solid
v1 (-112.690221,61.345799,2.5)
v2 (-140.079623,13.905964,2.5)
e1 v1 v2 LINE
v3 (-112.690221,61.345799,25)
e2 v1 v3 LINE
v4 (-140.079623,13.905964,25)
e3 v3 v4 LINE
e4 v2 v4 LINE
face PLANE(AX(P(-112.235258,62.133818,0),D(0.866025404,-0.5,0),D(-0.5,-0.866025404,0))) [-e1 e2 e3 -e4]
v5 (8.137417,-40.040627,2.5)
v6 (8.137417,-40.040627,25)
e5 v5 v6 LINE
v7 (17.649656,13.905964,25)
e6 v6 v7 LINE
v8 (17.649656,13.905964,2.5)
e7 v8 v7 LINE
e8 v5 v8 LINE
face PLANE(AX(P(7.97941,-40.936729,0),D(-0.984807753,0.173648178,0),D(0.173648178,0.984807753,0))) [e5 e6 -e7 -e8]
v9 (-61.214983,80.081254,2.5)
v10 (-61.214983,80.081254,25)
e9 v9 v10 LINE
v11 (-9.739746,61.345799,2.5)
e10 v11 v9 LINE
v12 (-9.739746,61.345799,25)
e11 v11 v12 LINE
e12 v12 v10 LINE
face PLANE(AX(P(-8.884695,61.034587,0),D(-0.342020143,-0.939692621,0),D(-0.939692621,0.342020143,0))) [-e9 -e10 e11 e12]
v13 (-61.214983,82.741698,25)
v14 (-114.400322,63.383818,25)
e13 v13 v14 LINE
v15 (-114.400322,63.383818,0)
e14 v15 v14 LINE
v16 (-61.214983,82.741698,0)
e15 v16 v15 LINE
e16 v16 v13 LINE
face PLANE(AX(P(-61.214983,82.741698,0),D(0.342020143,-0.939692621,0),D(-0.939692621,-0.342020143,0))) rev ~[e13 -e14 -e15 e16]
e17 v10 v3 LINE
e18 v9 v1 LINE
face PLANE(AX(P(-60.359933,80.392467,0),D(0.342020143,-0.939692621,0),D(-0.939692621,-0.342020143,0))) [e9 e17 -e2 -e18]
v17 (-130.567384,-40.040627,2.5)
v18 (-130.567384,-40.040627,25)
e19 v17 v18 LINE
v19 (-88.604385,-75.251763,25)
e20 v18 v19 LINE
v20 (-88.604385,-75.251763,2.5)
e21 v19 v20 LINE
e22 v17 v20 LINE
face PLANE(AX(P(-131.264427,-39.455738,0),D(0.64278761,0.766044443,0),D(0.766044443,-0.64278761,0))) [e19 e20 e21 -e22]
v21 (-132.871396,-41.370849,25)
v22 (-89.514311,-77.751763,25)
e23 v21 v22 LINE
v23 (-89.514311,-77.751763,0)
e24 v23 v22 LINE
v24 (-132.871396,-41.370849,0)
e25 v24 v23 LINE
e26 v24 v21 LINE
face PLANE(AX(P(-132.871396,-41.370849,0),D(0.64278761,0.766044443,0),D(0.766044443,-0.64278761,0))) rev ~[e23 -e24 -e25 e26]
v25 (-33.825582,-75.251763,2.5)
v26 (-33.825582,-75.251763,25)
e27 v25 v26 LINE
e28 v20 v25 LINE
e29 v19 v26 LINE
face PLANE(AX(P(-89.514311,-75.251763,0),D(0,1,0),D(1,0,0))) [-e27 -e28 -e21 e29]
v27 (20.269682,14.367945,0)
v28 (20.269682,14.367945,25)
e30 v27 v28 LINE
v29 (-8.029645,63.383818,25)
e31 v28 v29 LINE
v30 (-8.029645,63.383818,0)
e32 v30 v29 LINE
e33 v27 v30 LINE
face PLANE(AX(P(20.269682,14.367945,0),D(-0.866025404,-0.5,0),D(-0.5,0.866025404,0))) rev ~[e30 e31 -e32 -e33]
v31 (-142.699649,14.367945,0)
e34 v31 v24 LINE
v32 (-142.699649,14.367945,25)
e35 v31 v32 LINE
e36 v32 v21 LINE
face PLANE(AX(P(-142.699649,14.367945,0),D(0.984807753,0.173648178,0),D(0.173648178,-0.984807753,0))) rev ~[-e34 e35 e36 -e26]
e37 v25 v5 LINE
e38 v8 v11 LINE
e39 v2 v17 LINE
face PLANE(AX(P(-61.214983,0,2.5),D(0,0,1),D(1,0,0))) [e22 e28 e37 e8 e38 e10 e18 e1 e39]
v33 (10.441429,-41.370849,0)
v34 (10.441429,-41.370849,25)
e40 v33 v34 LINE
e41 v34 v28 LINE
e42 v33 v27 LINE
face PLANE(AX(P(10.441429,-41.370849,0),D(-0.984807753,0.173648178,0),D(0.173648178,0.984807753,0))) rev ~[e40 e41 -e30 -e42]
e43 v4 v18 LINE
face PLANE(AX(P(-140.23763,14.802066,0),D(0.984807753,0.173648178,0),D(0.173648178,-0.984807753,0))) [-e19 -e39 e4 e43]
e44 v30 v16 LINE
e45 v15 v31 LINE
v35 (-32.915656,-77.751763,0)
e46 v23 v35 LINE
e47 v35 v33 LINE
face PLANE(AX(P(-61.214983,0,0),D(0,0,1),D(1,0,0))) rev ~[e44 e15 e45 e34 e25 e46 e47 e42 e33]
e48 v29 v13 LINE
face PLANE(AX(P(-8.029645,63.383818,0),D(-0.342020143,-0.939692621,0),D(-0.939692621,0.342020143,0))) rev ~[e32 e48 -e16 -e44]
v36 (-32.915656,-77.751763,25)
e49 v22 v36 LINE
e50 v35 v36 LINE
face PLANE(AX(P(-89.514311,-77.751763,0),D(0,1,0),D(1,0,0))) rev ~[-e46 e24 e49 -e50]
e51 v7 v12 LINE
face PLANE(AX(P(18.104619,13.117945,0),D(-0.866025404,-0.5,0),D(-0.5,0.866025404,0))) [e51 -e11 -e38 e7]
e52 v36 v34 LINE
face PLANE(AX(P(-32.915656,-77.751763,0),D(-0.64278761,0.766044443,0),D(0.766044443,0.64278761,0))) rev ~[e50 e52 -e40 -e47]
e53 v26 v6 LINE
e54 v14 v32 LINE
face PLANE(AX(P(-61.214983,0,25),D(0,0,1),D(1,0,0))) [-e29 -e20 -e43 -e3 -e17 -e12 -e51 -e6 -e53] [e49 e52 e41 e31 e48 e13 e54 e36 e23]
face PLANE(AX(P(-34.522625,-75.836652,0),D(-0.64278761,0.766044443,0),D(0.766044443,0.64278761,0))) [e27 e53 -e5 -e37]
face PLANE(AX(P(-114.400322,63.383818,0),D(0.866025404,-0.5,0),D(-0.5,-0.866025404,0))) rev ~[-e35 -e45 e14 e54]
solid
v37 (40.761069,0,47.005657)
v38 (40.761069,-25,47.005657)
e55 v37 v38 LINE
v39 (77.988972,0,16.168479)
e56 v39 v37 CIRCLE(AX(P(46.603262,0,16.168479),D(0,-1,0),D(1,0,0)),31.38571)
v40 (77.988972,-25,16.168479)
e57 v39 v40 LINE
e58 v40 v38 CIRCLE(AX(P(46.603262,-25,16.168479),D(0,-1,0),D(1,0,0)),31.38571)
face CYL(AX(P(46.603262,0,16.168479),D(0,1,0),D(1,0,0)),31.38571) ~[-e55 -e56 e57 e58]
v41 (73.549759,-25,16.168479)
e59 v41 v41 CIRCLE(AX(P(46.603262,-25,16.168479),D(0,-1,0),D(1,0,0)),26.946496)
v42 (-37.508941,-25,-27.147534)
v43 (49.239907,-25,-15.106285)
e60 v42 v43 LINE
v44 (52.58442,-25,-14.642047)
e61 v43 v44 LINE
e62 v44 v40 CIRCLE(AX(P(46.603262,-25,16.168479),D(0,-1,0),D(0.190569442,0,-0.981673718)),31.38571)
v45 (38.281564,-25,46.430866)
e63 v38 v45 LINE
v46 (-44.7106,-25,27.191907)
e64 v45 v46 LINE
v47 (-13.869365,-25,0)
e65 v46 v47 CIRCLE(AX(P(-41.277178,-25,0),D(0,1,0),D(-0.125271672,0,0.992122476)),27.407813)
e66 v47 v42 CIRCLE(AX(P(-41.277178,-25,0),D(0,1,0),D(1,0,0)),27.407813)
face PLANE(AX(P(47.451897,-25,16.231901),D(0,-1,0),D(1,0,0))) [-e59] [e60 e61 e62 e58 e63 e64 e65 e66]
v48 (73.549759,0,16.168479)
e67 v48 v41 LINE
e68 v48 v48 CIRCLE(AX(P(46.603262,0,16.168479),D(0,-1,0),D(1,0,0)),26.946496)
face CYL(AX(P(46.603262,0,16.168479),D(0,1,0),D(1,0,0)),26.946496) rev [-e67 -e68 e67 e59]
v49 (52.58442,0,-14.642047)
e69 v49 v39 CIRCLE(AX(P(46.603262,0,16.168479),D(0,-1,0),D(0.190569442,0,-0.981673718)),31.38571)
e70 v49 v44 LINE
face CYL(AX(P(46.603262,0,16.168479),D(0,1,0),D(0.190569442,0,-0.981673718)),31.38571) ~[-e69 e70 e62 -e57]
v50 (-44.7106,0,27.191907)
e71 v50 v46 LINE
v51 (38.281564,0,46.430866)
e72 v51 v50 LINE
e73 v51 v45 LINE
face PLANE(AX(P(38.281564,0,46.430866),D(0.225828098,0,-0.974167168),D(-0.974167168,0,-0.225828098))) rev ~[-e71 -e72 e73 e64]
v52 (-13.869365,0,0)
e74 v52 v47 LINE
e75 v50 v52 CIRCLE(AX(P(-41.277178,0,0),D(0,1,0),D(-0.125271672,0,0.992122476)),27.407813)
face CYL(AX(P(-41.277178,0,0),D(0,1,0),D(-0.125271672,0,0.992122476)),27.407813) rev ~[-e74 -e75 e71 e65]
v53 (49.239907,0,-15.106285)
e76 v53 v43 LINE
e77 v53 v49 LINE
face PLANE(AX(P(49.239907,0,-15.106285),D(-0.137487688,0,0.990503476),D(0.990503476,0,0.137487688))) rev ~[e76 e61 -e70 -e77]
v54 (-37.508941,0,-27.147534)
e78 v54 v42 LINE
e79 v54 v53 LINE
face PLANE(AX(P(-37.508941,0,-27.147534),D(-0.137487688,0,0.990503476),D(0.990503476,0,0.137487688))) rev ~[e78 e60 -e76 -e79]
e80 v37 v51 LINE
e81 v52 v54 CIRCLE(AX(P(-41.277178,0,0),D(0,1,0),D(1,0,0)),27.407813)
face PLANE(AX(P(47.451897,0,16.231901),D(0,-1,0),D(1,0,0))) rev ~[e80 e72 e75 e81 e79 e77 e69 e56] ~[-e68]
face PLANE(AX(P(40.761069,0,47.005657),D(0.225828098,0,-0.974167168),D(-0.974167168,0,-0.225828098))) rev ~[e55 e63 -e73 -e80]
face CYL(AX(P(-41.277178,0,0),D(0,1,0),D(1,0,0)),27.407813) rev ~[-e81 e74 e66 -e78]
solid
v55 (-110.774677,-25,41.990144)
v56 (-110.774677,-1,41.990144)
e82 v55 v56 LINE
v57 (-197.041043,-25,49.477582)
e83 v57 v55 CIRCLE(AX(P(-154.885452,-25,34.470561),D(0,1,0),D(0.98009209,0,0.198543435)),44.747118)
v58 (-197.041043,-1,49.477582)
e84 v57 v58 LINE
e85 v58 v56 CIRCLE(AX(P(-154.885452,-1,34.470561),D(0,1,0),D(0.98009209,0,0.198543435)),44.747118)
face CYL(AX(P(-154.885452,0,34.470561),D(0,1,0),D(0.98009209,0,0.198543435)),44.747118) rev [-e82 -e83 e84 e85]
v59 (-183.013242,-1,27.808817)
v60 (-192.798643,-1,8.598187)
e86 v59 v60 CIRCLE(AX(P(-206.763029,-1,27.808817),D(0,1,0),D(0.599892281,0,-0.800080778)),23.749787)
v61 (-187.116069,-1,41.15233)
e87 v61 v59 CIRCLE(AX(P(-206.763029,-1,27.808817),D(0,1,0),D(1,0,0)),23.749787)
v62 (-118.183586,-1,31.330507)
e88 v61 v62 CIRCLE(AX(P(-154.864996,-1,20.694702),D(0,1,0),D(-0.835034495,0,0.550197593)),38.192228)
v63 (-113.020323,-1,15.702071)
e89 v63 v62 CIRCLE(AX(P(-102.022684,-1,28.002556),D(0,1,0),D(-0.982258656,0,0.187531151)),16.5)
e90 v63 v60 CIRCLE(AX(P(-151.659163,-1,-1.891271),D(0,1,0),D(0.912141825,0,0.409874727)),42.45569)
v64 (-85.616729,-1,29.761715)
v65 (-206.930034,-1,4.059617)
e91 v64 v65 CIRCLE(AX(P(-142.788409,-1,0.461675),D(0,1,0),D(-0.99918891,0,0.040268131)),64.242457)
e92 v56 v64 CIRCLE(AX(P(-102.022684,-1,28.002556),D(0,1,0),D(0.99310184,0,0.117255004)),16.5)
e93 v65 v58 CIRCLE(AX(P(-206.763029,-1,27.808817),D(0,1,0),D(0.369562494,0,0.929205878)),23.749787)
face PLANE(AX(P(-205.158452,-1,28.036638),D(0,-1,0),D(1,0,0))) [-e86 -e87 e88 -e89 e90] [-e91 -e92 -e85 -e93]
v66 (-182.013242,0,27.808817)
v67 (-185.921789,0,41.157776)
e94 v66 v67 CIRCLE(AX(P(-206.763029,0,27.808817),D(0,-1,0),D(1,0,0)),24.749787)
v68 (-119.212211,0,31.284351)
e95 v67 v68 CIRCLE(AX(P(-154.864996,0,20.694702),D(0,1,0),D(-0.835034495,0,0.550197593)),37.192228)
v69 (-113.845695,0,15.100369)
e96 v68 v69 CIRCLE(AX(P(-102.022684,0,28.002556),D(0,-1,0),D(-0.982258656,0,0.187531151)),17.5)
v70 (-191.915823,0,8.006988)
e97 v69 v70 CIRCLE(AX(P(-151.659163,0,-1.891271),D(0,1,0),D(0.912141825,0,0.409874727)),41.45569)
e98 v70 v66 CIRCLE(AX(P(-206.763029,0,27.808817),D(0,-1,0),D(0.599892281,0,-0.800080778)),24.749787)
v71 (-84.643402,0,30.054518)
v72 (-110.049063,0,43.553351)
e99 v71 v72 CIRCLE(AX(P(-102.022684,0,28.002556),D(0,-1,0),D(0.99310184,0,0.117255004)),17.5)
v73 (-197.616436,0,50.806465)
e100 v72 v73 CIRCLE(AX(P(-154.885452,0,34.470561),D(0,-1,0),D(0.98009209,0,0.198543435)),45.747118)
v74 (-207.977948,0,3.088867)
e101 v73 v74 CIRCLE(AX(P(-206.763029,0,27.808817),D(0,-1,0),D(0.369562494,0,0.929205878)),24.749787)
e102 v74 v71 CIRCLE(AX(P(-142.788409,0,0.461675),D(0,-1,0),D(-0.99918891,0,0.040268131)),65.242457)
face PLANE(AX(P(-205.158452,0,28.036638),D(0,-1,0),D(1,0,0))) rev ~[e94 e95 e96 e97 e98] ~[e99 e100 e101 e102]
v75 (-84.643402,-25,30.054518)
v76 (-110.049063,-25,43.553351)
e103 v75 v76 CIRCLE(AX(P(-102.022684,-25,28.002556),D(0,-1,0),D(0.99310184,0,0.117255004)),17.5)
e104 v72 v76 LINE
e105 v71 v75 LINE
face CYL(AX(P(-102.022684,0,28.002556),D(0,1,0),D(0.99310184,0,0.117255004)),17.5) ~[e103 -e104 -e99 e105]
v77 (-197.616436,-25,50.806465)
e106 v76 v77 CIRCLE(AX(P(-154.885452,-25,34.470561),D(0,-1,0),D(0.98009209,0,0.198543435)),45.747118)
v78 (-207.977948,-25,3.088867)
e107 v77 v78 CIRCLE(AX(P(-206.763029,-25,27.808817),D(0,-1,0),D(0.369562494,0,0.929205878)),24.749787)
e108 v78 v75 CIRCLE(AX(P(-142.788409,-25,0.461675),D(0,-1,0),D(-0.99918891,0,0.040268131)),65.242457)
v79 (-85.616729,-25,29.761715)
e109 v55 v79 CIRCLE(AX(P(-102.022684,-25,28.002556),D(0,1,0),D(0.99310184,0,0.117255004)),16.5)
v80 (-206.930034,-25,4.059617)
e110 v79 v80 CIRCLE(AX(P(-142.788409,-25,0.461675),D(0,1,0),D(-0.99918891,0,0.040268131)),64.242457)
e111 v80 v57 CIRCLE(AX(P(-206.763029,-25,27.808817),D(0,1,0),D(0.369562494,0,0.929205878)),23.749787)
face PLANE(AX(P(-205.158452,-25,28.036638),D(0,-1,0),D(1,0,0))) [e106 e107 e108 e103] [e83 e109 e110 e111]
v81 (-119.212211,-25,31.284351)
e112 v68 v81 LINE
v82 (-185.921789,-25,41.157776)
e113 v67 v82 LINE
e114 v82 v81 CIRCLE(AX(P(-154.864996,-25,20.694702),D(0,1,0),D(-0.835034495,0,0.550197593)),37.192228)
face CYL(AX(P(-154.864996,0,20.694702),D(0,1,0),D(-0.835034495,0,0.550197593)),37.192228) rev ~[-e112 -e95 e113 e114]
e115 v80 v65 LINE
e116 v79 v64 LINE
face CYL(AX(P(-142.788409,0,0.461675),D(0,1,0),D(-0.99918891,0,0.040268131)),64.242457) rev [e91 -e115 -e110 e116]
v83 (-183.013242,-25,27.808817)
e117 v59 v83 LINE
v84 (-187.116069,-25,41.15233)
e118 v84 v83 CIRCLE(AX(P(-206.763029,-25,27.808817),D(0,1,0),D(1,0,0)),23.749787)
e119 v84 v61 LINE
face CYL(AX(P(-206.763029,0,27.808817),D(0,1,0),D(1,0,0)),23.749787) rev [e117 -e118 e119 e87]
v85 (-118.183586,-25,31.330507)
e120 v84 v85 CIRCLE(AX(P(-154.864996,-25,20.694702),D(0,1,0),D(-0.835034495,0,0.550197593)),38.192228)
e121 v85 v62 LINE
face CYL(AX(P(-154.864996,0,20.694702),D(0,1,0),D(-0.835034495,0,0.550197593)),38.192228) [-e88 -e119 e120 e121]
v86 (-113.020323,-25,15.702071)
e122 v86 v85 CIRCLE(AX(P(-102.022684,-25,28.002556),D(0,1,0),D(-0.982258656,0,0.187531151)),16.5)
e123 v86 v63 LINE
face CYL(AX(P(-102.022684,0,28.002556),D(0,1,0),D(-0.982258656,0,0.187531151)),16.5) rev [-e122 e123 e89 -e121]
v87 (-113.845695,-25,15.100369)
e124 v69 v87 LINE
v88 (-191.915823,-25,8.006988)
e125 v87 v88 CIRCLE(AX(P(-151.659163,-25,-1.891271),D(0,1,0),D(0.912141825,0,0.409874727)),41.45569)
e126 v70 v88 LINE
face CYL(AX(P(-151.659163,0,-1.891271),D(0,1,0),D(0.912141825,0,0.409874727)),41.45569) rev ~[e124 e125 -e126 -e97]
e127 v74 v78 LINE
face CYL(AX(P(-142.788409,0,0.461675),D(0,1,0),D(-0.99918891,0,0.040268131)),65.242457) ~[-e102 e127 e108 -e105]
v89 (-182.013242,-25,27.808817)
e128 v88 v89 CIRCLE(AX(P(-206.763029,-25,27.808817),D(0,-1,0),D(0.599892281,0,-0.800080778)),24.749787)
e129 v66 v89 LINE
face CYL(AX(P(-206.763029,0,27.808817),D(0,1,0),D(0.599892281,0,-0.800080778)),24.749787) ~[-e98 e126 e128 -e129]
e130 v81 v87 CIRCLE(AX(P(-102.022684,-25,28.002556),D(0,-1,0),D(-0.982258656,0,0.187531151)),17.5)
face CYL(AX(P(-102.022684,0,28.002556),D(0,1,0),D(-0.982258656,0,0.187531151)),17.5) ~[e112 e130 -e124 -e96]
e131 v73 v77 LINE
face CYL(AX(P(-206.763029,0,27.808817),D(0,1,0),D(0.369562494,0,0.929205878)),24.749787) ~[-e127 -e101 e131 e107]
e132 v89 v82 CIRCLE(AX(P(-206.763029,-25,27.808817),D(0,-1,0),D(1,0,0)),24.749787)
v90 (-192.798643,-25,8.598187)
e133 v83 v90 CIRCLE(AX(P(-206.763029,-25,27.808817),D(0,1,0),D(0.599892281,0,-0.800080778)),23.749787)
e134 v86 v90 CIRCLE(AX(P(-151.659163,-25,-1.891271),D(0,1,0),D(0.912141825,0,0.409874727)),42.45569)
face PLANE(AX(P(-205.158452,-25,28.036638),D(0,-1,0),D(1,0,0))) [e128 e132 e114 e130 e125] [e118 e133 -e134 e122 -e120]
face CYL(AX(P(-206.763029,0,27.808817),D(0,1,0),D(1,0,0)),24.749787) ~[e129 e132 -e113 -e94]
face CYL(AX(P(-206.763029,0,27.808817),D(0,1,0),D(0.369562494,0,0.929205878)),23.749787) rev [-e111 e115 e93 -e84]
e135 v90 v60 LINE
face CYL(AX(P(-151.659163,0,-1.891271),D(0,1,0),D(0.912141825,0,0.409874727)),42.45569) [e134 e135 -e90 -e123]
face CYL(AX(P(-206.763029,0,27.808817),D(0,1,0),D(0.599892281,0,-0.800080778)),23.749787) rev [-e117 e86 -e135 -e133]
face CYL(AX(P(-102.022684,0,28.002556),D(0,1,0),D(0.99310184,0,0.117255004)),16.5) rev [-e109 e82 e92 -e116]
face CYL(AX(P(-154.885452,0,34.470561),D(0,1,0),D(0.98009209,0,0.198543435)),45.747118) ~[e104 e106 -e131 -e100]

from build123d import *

# Parameters (mm, degrees)
F0_R     = 26.9464960859
F1_DEPTH = 25
F3_DEPTH = 25
F4_T     = -1
F6_DEPTH = 25
F7_T     = -2.5


# Not quite as in the source:
# - a feature of the source that left no trace in its solid (it failed there, or was rolled back) is left out
# - the program builds the solid bodies; features that only make, move or delete a surface that nothing else refers to are left out


with BuildPart() as f1:
    # F0 (on Front) → F1 (new body)
    with BuildSketch(Plane.XZ):
        with BuildLine():
            Line((40.761068845, 47.0056567036), (38.2815639413, 46.4308663652))
            ThreePointArc((38.2815639413, 46.4308663652), (15.703663518, 10.6659749386), (49.2399074327, -15.1062851558))
            Line((49.2399074327, -15.1062851558), (52.5844195802, -14.6420472673))
            ThreePointArc((52.5844195802, -14.6420472673), (70.8188113885, -3.7982421999), (77.988971946, 16.1684788764))
            ThreePointArc((77.988971946, 16.1684788764), (66.6245182731, 40.3389583174), (40.761068845, 47.0056567036))
        make_face()
        with Locations((46.6032624245, 16.1684788764)):
            Circle(F0_R, mode=Mode.SUBTRACT)
        with BuildLine():
            ThreePointArc((-44.7106001415, 27.1919070038), (-23.151428053, 20.5583413445), (-13.8693649386, 0))
            ThreePointArc((-13.8693649386, 0), (-20.6075462255, -17.9987370156), (-37.5089408348, -27.1475337383))
            Line((-37.5089408348, -27.1475337383), (49.2399074327, -15.1062851558))
            ThreePointArc((49.2399074327, -15.1062851558), (15.703663518, 10.6659749386), (38.2815639413, 46.4308663652))
            Line((38.2815639413, 46.4308663652), (-44.7106001415, 27.1919070038))
        make_face()
    extrude(amount=F1_DEPTH)


with BuildPart() as f3:
    # F2 (on Front) → F3 (new body)
    with BuildSketch(Plane.XZ):
        with BuildLine():
            ThreePointArc((-197.6164360222, 50.8064648047), (-230.9491852504, 33.0606563326), (-207.9779482368, 3.0888669381))
            ThreePointArc((-207.9779482368, 3.0888669381), (-199.5168720301, 4.1435435485), (-191.9158228131, 8.0069881422))
            ThreePointArc((-191.9158228131, 8.0069881422), (-184.626891673, 16.7388855513), (-182.0132419339, 27.8088171035))
            ThreePointArc((-182.0132419339, 27.8088171035), (-183.0104691396, 34.7635176788), (-185.921789492, 41.1577757279))
            ThreePointArc((-185.921789492, 41.1577757279), (-191.012098095, 46.8996561949), (-197.6164360222, 50.8064648047))
        make_face()
        with BuildLine():
            ThreePointArc((-119.2122107169, 31.2843508649), (-116.0438313369, 38.4743002747), (-110.0490633826, 43.5533511295))
            ThreePointArc((-110.0490633826, 43.5533511295), (-151.1091973781, 80.0615546597), (-197.6164360222, 50.8064648047))
            ThreePointArc((-197.6164360222, 50.8064648047), (-191.012098095, 46.8996561949), (-185.921789492, 41.1577757279))
            ThreePointArc((-185.921789492, 41.1577757279), (-149.4196390648, 57.4861392064), (-119.2122107169, 31.2843508649))
        make_face()
        with BuildLine():
            ThreePointArc((-113.8456945473, 15.100368808), (-94.9747299387, 11.984555216), (-84.5226842358, 28.0025557225))
            ThreePointArc((-84.5226842358, 28.0025557225), (-84.552889755, 29.030310945), (-84.6434020412, 30.0545182956))
            ThreePointArc((-84.6434020412, 30.0545182956), (-93.811483299, 43.4565577664), (-110.0490633826, 43.5533511295))
            ThreePointArc((-110.0490633826, 43.5533511295), (-116.0438313369, 38.4743002747), (-119.2122107169, 31.2843508649))
            ThreePointArc((-119.2122107169, 31.2843508649), (-118.6332875237, 22.4945743852), (-113.8456945473, 15.100368808))
        make_face()
        with BuildLine():
            ThreePointArc((-84.6434020412, 30.0545182956), (-84.552889755, 29.030310945), (-84.5226842358, 28.0025557225))
            ThreePointArc((-84.5226842358, 28.0025557225), (-94.9747299387, 11.984555216), (-113.8456945473, 15.100368808))
            ThreePointArc((-113.8456945473, 15.100368808), (-147.9079885613, -43.1768963111), (-191.9158228131, 8.0069881422))
            ThreePointArc((-191.9158228131, 8.0069881422), (-199.5168720301, 4.1435435485), (-207.9779482368, 3.0888669381))
            ThreePointArc((-207.9779482368, 3.0888669381), (-128.8530958523, -63.275168505), (-84.6434020412, 30.0545182956))
        make_face()
    extrude(amount=F3_DEPTH)

    # F4
    f4_openings = [f3.faces().sort_by_distance(p)[0] for p in [
        (-228.882394, -25, 32.611868),
    ]]
    offset(amount=F4_T, openings=f4_openings, kind=Kind.INTERSECTION)


with BuildPart() as f6:
    # F5 (on Top) → F6 (new body)
    with BuildSketch(Plane.XY):
        Polygon((-89.5143109171, -77.751763165), (-32.9156560095, -77.751763165), (10.4414290704, -41.3708490655), (20.2696823535, 14.3679450975), (-8.0296451003, 63.3838180675), (-61.2149834633, 82.741698131), (-114.4003218263, 63.3838180675), (-142.6996492801, 14.3679450975), (-132.871395997, -41.3708490655), align=None)
    extrude(amount=F6_DEPTH)

    # F7
    f7_openings = [f6.faces().sort_by_distance(p)[0] for p in [
        (-61.214983, 0, 25),
    ]]
    offset(amount=F7_T, openings=f7_openings)


solid = Compound([f1.part, f3.part, f6.part])
